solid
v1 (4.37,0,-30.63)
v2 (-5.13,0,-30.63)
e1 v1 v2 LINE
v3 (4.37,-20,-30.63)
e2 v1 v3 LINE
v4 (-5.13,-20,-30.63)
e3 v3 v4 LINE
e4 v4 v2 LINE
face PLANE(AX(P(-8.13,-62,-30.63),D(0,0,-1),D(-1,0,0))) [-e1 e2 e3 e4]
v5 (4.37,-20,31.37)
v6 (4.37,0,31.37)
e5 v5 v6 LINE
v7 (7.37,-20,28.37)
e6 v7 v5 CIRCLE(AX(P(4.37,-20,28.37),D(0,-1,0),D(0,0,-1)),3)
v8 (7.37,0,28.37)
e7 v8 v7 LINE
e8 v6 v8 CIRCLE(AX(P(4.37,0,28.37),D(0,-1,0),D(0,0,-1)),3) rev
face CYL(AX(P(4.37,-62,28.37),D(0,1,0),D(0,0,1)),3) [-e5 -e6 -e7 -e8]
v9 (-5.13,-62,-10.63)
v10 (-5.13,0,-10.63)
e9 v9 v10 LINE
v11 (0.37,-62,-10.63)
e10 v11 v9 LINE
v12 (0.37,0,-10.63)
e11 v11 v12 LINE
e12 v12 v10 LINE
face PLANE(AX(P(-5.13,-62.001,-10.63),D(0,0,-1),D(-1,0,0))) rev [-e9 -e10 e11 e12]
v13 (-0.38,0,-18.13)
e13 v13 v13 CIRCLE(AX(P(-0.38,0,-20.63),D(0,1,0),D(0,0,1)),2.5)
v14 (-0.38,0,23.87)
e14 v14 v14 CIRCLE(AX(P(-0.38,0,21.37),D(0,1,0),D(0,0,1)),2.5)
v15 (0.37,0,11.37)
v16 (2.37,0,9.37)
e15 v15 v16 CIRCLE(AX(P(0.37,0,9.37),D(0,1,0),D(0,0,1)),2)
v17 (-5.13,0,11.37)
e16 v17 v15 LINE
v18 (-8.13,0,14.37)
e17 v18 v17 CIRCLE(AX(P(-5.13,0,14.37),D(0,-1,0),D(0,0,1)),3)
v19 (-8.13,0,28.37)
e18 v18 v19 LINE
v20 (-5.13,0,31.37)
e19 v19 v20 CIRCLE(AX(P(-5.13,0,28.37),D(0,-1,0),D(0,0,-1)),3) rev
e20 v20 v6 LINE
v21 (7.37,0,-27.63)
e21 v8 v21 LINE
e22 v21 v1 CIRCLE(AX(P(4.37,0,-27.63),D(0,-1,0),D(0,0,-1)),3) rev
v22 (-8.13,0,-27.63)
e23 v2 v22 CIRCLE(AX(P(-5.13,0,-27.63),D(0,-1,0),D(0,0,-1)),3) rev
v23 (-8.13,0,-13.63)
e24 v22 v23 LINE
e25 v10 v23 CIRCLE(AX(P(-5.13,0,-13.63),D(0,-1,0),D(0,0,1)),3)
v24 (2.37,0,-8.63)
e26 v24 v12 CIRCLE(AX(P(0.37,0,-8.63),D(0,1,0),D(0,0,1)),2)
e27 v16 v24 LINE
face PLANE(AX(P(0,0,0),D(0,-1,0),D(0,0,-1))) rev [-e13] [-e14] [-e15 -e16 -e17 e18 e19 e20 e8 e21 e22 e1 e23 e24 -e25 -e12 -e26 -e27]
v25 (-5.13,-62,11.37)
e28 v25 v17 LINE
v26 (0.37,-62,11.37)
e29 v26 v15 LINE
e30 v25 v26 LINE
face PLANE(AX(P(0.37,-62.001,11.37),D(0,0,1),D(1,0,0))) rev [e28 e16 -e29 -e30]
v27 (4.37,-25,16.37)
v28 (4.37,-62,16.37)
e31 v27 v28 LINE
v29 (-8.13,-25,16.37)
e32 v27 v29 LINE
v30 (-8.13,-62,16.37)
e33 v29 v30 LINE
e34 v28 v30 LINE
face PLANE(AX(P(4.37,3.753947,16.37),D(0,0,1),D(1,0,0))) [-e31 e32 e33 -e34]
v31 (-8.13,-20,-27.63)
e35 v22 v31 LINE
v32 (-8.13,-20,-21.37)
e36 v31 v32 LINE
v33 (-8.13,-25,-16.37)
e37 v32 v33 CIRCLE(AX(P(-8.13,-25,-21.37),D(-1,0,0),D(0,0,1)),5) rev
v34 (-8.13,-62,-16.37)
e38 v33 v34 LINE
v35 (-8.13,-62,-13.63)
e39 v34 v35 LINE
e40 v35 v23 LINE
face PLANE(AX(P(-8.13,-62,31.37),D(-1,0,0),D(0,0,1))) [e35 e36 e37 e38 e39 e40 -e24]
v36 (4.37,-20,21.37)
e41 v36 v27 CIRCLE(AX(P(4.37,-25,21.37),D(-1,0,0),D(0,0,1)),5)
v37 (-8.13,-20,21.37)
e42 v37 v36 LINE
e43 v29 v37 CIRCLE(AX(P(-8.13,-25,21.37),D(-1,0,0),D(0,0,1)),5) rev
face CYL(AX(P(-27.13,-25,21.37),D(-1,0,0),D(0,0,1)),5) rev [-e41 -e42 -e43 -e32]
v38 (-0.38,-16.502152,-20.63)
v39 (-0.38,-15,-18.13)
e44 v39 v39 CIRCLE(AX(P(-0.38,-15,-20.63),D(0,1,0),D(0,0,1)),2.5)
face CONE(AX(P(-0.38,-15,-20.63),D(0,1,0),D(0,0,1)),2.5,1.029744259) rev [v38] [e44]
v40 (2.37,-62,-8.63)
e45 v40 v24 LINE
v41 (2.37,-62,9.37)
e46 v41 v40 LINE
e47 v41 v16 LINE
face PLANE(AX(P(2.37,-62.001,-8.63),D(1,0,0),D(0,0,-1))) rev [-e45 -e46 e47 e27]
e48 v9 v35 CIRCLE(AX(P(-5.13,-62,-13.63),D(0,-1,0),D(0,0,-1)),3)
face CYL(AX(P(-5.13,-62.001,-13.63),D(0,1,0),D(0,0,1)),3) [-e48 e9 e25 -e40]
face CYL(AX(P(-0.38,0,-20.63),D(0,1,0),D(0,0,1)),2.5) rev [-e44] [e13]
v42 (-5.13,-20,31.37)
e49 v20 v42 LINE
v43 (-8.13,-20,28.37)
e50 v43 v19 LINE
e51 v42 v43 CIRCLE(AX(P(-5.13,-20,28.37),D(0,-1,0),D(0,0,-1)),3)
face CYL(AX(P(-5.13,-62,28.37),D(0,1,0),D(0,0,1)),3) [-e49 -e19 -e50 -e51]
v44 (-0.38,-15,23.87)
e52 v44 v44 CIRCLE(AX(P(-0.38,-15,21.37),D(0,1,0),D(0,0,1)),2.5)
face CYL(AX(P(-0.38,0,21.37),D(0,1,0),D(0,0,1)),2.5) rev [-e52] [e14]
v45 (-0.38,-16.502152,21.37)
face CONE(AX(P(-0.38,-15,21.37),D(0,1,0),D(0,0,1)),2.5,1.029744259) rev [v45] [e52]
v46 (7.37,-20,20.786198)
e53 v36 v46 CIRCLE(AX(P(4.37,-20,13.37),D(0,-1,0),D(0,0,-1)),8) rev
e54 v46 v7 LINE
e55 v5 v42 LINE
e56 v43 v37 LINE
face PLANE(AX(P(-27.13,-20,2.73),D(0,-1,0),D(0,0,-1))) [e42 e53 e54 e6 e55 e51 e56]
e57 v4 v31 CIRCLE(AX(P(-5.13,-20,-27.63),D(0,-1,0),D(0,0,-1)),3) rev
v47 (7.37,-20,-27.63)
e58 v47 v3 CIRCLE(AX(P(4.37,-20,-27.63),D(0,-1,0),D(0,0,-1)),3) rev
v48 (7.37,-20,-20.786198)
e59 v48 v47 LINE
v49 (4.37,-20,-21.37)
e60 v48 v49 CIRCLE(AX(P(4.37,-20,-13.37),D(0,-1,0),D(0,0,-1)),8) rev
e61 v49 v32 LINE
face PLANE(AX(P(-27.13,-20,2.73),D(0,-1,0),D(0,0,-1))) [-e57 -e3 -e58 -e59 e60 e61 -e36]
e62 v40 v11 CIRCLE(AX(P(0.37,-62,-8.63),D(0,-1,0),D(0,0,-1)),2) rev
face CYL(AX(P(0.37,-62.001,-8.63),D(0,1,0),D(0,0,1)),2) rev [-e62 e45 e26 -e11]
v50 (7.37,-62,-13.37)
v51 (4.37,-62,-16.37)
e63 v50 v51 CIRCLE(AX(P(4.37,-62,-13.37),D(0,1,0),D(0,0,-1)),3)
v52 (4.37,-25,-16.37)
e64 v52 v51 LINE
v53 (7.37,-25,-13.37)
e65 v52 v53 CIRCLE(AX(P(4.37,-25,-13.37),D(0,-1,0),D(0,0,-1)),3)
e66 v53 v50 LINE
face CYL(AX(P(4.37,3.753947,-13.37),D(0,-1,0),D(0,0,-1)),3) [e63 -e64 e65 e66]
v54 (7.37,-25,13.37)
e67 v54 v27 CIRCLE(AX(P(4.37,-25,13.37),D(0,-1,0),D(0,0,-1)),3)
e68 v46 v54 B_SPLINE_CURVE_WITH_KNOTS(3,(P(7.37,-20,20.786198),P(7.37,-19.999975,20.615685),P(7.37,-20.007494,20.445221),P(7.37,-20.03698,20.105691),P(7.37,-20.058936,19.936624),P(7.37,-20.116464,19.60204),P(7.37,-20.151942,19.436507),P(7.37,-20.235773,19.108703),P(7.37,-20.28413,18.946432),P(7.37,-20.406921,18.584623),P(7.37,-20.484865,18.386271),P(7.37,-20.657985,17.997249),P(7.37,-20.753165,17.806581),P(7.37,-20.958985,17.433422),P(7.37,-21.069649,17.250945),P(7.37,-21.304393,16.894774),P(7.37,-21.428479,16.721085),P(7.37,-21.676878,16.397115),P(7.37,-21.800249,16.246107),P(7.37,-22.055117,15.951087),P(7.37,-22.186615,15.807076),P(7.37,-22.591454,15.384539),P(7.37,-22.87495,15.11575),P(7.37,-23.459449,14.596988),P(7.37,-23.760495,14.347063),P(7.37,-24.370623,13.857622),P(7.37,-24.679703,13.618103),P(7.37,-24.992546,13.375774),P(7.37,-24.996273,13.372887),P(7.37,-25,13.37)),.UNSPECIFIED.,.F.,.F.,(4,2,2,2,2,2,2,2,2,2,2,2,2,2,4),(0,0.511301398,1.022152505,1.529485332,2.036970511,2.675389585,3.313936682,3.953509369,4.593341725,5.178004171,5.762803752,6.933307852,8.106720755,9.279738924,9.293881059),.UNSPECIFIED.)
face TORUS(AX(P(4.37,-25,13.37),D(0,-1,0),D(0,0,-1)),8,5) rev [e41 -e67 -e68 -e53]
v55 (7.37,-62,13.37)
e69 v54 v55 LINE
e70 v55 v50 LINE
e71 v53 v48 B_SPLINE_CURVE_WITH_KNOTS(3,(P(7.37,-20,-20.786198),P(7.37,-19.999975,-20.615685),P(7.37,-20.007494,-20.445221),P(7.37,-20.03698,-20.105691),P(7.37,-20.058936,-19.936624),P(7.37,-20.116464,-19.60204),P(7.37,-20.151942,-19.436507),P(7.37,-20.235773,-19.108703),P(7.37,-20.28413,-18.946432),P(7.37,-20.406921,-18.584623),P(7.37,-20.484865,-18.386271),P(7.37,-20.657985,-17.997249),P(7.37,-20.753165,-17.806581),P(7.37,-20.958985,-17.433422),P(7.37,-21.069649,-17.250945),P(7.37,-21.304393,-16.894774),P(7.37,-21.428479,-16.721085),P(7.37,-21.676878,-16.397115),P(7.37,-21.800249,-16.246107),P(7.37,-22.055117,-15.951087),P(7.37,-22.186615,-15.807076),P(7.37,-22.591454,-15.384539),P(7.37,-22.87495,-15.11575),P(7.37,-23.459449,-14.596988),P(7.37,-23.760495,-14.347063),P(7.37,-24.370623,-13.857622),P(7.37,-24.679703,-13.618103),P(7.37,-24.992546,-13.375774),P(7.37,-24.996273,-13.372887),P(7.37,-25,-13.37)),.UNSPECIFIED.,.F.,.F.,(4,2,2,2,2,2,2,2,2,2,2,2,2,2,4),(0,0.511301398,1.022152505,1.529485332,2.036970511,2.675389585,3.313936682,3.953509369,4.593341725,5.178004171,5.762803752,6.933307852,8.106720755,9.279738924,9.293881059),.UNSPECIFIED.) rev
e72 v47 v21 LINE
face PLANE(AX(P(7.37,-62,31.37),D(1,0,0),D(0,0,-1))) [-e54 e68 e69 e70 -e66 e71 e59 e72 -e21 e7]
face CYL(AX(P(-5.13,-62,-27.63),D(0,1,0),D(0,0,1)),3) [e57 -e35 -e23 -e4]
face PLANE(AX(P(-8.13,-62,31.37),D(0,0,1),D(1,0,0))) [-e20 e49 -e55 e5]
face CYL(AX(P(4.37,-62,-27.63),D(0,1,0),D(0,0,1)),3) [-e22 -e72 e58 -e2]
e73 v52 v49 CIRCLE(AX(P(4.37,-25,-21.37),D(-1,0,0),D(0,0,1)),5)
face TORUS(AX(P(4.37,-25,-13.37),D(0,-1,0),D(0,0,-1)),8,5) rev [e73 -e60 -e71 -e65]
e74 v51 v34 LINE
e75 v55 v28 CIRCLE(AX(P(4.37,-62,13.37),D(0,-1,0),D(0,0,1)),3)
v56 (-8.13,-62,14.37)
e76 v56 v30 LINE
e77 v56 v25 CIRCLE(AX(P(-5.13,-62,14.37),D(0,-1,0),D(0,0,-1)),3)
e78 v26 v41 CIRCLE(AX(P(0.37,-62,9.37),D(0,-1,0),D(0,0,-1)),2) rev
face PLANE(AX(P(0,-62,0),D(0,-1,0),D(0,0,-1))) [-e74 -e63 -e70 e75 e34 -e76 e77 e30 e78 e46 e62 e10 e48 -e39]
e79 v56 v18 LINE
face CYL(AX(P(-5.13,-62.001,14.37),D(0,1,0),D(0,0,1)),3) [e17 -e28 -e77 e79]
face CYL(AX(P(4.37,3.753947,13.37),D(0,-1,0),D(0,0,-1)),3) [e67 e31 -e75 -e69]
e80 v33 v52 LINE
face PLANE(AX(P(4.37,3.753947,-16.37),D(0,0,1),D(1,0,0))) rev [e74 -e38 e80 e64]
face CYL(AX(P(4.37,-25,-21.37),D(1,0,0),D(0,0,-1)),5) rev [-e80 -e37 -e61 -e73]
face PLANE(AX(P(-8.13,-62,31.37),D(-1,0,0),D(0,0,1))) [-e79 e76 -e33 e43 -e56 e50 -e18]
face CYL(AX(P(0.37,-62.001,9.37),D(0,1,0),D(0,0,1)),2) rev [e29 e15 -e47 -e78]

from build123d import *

# Parameters (mm, degrees)
SKETCH1_W             = 15.5
SKETCH1_H             = 62
BOSS_EXTRUDE1_DEPTH   = 62
FILLET1_R             = 3
CUT_EXTRUDE1_REACH    = 71.958
CUT_EXTRUDE2_DEPTH    = 42
FILLET2_R             = 5
M6_TAPPED_HOLE1_D     = 5
M6_TAPPED_HOLE1_DEPTH = 15
M6_TAPPED_HOLE1_TIP   = 1.502151548


with BuildPart() as part:
    # Sketch1 → Boss-Extrude1 (new body)
    with BuildSketch(Plane(origin=(0, 0, 0), x_dir=(1, 0, 0), z_dir=(0, 1, 0))):
        with Locations((-0.38, -0.37)):
            Rectangle(SKETCH1_W, SKETCH1_H)
    extrude(amount=-BOSS_EXTRUDE1_DEPTH)

    # Fillet1
    fillet1_edges = [part.edges().sort_by_distance(p)[0] for p in [
        (7.37, -31, 31.37),
        (-8.13, -31, 31.37),
        (-8.13, -31, -30.63),
        (7.37, -31, -30.63),
    ]]
    fillet(fillet1_edges, radius=FILLET1_R)

    # Sketch2 → Cut-Extrude1 (cut, up to next)
    with BuildSketch(Plane(origin=(0, 0, 0), x_dir=(1, 0, 0), z_dir=(0, 1, 0)), mode=Mode.PRIVATE) as cut_extrude1_sk1:
        with BuildLine():
            Line((-5.13, 10.63), (0.37, 10.63))
            ThreePointArc((0.37, 10.63), (1.784213562, 10.044213562), (2.37, 8.63))
            Line((2.37, 8.63), (2.37, -9.37))
            ThreePointArc((2.37, -9.37), (1.784213562, -10.784213562), (0.37, -11.37))
            Line((0.37, -11.37), (-5.13, -11.37))
            ThreePointArc((-5.13, -11.37), (-7.251320344, -12.248679656), (-8.13, -14.37))
            Line((-8.13, -14.37), (-8.13, 13.63))
            ThreePointArc((-8.13, 13.63), (-7.251320344, 11.508679656), (-5.13, 10.63))
        make_face()
    cut_extrude1_tool1 = extrude(cut_extrude1_sk1.sketch, amount=-CUT_EXTRUDE1_REACH, mode=Mode.PRIVATE) & part.part
    add(cut_extrude1_tool1.solids().sort_by_distance((-2.991251, 0, 0.37))[0], mode=Mode.SUBTRACT)

    # Sketch3 → Cut-Extrude2 (cut)
    with BuildSketch(Plane(origin=(0, -62, 0), x_dir=(1, 0, 0), z_dir=(0, 1, 0))):
        with BuildLine():
            Line((4.37, -16.37), (-8.13, -16.37))
            Line((-8.13, -16.37), (-8.13, -28.37))
            ThreePointArc((-8.13, -28.37), (-7.251320344, -30.491320344), (-5.13, -31.37))
            Line((-5.13, -31.37), (4.37, -31.37))
            ThreePointArc((4.37, -31.37), (6.491320344, -30.491320344), (7.37, -28.37))
            Line((7.37, -28.37), (7.37, -13.37))
            ThreePointArc((7.37, -13.37), (6.491320344, -15.491320344), (4.37, -16.37))
        make_face()
    cut_extrude2 = extrude(amount=CUT_EXTRUDE2_DEPTH, mode=Mode.SUBTRACT)

    # Mirror1: Cut-Extrude2 across plane
    add(cut_extrude2.mirror(Plane.XY), mode=Mode.SUBTRACT)

    # Fillet2
    # the kernel refuses this fillet: 5 mm, written as the material it adds along each edge
    with BuildSketch(Plane(origin=(4.37, -20, -16.37), x_dir=(0, -1, 0), z_dir=(-1, 0, 0)), Plane(origin=(4.37, -20, 16.37), x_dir=(0, 0, 1), z_dir=(-1, 0, 0))) as fillet2_piece_1:
        with BuildLine():
            CenterArc((FILLET2_R, -FILLET2_R), FILLET2_R, 90, 90)
            Line((0, -FILLET2_R), (0, 0))
            Line((0, 0), (FILLET2_R, 0))
        make_face()
    extrude(amount=12.5)
    with BuildSketch(Plane(origin=(4.37, -20, -13.37), x_dir=(-0.5176042277799098, 0, -0.855620163030514), z_dir=(0.855620163030514, 0, -0.5176042277799098))) as fillet2_piece_2_section:
        with BuildLine():
            CenterArc((-3 - FILLET2_R, -FILLET2_R), FILLET2_R, 0, 90)
            Line((-3, -FILLET2_R), (-3, 0))
            Line((-3, 0), (-3 - FILLET2_R, 0))
        make_face()
    fillet2_piece_2 = revolve(axis=Axis((4.37, -20, -13.37), (0, 1, 0)), revolution_arc=328.828315396, mode=Mode.PRIVATE)
    fillet2_piece_2 = split(fillet2_piece_2, bisect_by=Plane(origin=(6.644254363, -21.721658314, -10.63), z_dir=(0, 0, -1)), keep=Keep.TOP, mode=Mode.PRIVATE)
    fillet2_piece_2 = split(fillet2_piece_2, bisect_by=Plane(origin=(7.37, -21.721658314, -15.644254458), z_dir=(-1, 0, 0)), keep=Keep.TOP, mode=Mode.PRIVATE)
    add(fillet2_piece_2)
    with BuildSketch(Plane(origin=(4.37, -20, 13.37), x_dir=(-0.5176042277799098, 0, 0.855620163030514), z_dir=(0.855620163030514, 0, 0.5176042277799098))) as fillet2_piece_3_section:
        with BuildLine():
            CenterArc((-3 - FILLET2_R, FILLET2_R), FILLET2_R, 270, 90)
            Line((-3, FILLET2_R), (-3, 0))
            Line((-3, 0), (-3 - FILLET2_R, 0))
        make_face()
    fillet2_piece_3 = revolve(axis=Axis((4.37, -20, 13.37), (0, -1, 0)), revolution_arc=328.828315396, mode=Mode.PRIVATE)
    fillet2_piece_3 = split(fillet2_piece_3, bisect_by=Plane(origin=(6.644254403, -21.721658525, 11.37), z_dir=(0, 0, 1)), keep=Keep.TOP, mode=Mode.PRIVATE)
    fillet2_piece_3 = split(fillet2_piece_3, bisect_by=Plane(origin=(7.37, -21.721658525, 15.644254403), z_dir=(-1, 0, 0)), keep=Keep.TOP, mode=Mode.PRIVATE)
    add(fillet2_piece_3)

    # M6 Tapped Hole1
    with Locations(Plane(origin=(0, 0, 0), x_dir=(1, 0, 0), z_dir=(0, 1, 0))):
        with Locations((-0.38, 20.63), (-0.38, -21.37)):
            Hole(M6_TAPPED_HOLE1_D / 2, depth=M6_TAPPED_HOLE1_DEPTH)
            with Locations((0, 0, -(M6_TAPPED_HOLE1_DEPTH + M6_TAPPED_HOLE1_TIP / 2))):  # 118° drill point
                Cone(0, M6_TAPPED_HOLE1_D / 2, M6_TAPPED_HOLE1_TIP, mode=Mode.SUBTRACT)


solid = part.part
